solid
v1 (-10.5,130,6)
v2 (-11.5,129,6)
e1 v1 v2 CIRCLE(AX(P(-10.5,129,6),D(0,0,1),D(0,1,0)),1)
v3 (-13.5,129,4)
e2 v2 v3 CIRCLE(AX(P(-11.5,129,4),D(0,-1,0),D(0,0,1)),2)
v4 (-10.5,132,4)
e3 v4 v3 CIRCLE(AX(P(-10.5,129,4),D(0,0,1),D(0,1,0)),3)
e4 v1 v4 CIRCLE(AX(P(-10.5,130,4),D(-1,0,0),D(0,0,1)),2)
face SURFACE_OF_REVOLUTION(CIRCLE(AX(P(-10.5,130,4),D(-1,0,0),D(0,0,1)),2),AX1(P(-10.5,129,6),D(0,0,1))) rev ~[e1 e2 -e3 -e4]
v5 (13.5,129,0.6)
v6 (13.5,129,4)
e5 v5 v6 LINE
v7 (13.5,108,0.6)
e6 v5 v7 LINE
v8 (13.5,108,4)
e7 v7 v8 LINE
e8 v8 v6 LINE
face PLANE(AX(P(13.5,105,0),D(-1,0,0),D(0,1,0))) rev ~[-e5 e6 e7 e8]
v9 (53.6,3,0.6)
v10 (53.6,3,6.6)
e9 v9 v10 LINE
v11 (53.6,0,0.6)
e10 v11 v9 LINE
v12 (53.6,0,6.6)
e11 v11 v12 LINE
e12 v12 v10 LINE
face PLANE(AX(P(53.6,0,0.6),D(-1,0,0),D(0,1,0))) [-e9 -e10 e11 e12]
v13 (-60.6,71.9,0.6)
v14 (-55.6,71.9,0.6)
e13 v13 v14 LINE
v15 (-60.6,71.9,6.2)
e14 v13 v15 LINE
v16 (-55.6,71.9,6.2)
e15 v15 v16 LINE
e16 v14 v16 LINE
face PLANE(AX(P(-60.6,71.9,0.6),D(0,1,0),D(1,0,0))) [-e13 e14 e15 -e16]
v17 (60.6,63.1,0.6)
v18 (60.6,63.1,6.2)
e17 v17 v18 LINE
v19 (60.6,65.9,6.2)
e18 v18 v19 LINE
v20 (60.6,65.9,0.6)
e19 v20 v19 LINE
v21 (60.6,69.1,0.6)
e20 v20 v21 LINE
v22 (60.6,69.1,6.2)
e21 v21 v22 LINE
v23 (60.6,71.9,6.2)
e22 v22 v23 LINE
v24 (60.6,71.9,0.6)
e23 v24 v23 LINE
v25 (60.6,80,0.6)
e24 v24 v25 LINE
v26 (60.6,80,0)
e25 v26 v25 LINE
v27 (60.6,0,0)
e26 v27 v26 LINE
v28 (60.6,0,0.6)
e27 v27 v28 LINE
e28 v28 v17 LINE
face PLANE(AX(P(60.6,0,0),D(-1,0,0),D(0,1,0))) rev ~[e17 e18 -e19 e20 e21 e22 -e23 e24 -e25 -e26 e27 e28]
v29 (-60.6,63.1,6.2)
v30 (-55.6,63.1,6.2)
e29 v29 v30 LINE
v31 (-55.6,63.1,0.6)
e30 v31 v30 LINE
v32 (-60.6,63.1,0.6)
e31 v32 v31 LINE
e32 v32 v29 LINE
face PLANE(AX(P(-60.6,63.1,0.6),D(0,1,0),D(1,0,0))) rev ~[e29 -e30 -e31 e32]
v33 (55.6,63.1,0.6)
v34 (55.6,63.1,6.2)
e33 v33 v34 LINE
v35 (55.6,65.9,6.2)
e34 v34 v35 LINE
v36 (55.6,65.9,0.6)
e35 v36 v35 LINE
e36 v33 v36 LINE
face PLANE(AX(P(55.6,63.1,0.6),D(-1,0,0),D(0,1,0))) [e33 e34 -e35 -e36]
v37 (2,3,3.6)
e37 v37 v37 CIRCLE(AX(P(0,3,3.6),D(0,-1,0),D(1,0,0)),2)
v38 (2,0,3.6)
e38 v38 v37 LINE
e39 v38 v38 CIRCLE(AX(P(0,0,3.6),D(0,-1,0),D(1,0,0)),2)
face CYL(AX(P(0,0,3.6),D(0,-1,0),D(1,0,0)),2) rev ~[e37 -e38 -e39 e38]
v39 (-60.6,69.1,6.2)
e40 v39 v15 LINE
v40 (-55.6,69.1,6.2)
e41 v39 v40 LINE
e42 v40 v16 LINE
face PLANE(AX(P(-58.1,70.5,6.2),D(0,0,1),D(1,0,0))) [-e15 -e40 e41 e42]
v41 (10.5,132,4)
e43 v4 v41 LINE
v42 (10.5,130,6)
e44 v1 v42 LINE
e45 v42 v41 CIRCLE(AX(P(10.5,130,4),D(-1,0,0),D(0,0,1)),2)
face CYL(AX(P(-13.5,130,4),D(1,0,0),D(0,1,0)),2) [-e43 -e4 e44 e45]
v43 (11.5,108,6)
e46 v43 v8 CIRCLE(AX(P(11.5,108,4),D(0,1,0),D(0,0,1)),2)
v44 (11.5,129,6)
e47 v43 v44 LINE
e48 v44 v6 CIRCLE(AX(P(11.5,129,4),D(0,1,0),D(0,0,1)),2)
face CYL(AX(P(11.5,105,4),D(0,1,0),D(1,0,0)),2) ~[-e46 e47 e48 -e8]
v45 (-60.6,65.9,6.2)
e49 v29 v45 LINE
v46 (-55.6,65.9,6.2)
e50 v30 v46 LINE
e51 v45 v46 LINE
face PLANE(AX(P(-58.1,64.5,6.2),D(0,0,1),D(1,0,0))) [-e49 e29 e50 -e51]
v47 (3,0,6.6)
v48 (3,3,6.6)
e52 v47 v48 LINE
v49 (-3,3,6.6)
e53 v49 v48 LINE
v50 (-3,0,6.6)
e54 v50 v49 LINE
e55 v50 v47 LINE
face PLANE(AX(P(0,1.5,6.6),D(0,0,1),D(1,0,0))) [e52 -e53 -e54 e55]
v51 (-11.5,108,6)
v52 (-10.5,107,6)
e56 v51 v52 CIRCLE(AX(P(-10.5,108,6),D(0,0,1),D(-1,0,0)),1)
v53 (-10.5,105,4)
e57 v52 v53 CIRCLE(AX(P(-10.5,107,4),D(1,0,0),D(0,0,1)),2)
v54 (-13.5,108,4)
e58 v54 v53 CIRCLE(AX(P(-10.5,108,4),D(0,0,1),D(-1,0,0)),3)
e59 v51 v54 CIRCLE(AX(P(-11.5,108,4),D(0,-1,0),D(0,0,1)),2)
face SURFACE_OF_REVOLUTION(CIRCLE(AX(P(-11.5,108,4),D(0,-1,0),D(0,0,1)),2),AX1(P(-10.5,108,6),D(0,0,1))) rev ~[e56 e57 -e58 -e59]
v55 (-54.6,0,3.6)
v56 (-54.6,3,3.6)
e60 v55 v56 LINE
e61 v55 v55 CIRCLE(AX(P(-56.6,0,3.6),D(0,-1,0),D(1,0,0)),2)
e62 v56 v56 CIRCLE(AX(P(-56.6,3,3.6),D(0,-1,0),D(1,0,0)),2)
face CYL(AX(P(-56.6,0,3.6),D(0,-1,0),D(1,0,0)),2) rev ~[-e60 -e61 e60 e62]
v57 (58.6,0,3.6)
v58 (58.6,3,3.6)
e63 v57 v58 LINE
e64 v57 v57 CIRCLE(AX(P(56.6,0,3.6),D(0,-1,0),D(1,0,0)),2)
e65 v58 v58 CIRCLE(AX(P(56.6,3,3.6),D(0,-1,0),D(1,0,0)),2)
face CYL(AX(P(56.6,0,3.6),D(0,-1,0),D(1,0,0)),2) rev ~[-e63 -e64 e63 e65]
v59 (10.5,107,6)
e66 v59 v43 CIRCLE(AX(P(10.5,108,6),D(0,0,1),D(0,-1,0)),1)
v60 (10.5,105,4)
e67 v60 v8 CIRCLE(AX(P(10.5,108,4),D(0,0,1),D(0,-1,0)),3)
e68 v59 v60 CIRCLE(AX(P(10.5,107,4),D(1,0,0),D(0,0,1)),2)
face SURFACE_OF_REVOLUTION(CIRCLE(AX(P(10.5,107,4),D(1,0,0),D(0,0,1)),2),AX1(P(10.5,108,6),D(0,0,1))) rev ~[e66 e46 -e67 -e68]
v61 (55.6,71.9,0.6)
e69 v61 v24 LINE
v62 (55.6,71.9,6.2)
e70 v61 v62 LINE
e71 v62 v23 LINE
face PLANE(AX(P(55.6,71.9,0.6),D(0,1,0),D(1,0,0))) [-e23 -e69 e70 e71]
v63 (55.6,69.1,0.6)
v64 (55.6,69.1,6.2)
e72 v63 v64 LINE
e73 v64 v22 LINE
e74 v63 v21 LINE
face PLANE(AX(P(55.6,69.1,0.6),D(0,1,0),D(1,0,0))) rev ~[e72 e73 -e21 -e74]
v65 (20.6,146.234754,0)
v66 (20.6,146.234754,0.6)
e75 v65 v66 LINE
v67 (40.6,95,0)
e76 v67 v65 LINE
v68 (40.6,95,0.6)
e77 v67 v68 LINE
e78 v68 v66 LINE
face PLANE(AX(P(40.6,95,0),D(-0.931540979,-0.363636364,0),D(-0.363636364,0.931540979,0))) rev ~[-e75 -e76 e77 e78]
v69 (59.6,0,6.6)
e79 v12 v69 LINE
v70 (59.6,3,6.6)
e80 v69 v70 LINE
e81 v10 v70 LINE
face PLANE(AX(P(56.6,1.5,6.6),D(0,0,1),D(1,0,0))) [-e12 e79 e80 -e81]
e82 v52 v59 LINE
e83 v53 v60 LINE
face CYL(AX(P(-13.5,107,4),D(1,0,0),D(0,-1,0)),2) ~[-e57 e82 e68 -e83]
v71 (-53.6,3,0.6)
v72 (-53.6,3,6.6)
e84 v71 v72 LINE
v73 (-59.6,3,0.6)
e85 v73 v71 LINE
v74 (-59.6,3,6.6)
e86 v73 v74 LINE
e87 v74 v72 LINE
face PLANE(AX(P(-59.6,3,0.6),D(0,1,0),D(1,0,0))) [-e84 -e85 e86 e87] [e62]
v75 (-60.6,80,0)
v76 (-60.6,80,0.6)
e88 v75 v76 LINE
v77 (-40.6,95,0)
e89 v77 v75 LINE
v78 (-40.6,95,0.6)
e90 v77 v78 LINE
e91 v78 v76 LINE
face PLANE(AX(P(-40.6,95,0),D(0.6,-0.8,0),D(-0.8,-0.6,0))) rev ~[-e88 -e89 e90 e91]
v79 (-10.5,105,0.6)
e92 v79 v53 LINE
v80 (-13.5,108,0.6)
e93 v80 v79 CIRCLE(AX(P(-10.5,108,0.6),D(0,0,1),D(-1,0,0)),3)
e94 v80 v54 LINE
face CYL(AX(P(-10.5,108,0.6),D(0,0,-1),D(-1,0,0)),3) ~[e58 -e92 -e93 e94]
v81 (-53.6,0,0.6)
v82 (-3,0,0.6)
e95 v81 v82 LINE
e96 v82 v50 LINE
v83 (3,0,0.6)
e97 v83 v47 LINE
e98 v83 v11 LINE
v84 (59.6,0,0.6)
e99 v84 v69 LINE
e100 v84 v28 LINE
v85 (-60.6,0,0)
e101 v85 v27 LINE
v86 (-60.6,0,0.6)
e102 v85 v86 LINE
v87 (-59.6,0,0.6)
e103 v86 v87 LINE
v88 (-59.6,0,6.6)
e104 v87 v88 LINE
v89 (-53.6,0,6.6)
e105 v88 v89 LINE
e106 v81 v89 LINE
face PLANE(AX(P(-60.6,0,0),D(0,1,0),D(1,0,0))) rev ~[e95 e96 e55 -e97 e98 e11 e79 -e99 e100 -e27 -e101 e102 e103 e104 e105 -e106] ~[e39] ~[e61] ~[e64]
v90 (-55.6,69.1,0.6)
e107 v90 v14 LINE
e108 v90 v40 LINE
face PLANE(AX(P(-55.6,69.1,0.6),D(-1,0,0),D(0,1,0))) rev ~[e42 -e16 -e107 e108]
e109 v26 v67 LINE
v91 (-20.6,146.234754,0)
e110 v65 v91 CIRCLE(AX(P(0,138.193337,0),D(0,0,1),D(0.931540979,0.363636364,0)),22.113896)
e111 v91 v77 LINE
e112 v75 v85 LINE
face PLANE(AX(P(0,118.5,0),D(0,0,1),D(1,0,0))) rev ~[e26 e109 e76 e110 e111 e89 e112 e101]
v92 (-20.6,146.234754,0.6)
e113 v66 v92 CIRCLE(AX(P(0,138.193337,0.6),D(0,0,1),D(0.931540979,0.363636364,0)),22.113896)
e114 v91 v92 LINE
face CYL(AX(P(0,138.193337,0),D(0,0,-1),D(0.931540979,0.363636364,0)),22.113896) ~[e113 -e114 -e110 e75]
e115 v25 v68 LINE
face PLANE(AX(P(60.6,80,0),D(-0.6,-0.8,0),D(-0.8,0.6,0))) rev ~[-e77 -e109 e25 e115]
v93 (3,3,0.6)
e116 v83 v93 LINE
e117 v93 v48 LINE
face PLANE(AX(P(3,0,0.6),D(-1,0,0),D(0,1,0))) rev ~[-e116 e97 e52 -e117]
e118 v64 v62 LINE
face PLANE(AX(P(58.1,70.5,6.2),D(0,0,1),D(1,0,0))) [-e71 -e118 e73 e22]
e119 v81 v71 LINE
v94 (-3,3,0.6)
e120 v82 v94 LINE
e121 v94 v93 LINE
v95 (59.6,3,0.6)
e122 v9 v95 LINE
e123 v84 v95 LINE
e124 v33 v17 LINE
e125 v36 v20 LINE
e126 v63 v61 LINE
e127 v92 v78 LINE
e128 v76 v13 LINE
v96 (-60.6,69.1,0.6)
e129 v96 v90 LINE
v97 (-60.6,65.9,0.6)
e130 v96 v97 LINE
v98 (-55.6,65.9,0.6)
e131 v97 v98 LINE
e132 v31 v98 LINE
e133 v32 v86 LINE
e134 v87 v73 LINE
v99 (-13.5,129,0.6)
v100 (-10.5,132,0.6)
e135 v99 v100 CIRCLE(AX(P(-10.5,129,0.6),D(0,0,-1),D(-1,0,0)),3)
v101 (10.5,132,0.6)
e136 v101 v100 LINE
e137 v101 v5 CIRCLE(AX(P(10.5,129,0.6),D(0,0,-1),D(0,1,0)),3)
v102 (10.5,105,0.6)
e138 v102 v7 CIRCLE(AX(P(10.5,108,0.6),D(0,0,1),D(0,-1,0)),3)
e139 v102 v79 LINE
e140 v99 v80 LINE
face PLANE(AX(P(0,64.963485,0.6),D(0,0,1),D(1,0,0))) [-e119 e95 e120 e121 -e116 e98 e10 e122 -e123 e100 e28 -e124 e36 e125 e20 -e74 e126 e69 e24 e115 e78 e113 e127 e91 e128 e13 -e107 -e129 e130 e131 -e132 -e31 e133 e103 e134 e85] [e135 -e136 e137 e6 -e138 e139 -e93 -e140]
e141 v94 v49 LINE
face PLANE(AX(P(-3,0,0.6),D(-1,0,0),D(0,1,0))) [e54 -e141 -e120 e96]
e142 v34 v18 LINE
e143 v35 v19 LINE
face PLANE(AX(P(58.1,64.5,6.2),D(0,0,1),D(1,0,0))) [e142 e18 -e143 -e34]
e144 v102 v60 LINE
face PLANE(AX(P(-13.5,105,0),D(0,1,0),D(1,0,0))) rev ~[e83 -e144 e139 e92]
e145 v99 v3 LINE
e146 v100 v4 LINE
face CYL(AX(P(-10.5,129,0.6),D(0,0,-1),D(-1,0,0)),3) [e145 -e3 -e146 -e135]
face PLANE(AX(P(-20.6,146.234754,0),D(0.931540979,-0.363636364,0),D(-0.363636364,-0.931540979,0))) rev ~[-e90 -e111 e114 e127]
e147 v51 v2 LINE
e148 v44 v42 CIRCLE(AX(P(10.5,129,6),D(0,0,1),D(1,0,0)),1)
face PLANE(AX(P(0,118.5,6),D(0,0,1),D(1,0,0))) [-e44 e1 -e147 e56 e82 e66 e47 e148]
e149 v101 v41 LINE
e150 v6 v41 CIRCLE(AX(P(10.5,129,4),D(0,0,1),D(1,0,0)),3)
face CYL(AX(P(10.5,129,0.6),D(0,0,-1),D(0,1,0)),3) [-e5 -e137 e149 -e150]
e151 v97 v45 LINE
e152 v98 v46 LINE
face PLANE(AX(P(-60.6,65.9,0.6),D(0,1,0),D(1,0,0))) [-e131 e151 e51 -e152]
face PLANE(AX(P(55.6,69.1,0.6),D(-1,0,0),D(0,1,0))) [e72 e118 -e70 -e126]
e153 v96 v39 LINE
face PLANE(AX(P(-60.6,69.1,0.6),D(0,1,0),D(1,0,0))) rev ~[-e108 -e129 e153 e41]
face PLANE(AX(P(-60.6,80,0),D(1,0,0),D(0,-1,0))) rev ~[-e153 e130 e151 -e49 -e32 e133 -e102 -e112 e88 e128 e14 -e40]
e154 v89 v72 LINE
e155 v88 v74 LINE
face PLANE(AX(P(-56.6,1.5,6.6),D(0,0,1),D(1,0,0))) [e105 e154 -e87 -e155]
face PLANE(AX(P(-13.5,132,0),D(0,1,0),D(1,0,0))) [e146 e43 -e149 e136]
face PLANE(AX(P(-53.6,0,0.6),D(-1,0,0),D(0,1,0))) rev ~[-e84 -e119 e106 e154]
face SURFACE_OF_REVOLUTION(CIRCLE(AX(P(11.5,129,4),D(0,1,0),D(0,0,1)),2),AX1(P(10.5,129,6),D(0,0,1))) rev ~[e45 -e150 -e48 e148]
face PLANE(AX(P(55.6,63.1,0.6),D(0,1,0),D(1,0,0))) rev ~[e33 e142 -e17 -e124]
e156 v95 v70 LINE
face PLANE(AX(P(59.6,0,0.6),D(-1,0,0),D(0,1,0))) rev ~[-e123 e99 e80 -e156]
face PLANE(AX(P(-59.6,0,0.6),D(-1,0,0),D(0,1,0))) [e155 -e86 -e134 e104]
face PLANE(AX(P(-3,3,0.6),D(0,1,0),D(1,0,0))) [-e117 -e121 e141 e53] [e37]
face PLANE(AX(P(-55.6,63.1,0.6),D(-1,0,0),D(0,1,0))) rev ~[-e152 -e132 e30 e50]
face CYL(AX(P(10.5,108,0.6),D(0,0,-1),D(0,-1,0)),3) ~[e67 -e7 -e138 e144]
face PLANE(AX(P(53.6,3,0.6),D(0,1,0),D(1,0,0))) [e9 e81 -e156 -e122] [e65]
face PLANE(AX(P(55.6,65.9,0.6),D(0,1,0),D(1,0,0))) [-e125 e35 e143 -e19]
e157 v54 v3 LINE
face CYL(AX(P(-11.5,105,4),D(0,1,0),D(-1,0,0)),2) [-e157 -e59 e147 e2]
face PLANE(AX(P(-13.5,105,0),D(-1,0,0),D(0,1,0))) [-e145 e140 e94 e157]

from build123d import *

# Parameters (mm, degrees)
F0_W         = 27
F0_H         = 27
F1_DEPTH     = 0.6
F2_DEPTH     = 6
F3_R         = 2
F4_T1_DEPTH  = 5.4
F4_T4_ANGLE  = 90
F4_T6_ANGLE  = 90
F4_T8_ANGLE  = 90
F4_T10_ANGLE = 90
F5_W         = 5
F5_H         = 2.8
F6_DEPTH     = 5.6
F7_W         = 6
F7_H         = 3
F8_DEPTH     = 6
F9_R         = 2
F10_DEPTH    = 4


# Not quite as in the source:
# - a fillet or chamfer that OpenCascade refuses, or shapes differently, is made with other operations: its cross-section is extruded or revolved along the edge and cut away or added


with BuildPart() as f1:
    # F0 (on Top) → F1 (new body)
    with BuildSketch(Plane.XY):
        with BuildLine():
            Line((-40.6, 95), (-60.6, 80))
            Line((-60.6, 80), (-60.6, 0))
            Line((-60.6, 0), (60.6, 0))
            Line((60.6, 0), (60.6, 80))
            Line((60.6, 80), (40.6, 95))
            Line((40.6, 95), (20.6, 146.2347538298))
            ThreePointArc((20.6, 146.2347538298), (0, 160.3072328817), (-20.6, 146.2347538298))
            Line((-20.6, 146.2347538298), (-40.6, 95))
        make_face()
        with Locations((0, 118.5)):
            Rectangle(F0_W, F0_H, mode=Mode.SUBTRACT)
        with Locations((0, 118.5)):
            Rectangle(F0_W, F0_H)
    extrude(amount=F1_DEPTH)

    # F0 (on Top) → F2 (join)
    with BuildSketch(Plane.XY):
        with Locations((0, 118.5)):
            Rectangle(F0_W, F0_H)
    extrude(amount=F2_DEPTH)

    # F3
    f3_edges = [f1.edges().sort_by_distance(p)[0] for p in [
        (0, 132, 6),
        (-13.5, 118.5, 6),
        (0, 105, 6),
        (13.5, 118.5, 6),
    ]]
    fillet(f3_edges, radius=F3_R)

    # F4: fillet of radius 3 on 4 edges, made by hand

    # F4_s2 → F4_t1 (cut)
    with BuildSketch(Plane.XY.offset(0.6)):
        with BuildLine():
            ThreePointArc((-13.5, 129), (-12.6213203436, 131.1213203436), (-10.5, 132))
            Line((-10.5, 132), (-13.5, 132))
            Line((-13.5, 132), (-13.5, 129))
        make_face()
        with BuildLine():
            ThreePointArc((-13.5, 108), (-12.6213203436, 105.8786796564), (-10.5, 105))
            Line((-10.5, 105), (-13.5, 105))
            Line((-13.5, 105), (-13.5, 108))
        make_face()
        with BuildLine():
            ThreePointArc((10.5, 105), (12.6213203436, 105.8786796564), (13.5, 108))
            Line((13.5, 108), (13.5, 105))
            Line((13.5, 105), (10.5, 105))
        make_face()
        with BuildLine():
            ThreePointArc((10.5, 132), (12.6213203436, 131.1213203436), (13.5, 129))
            Line((13.5, 129), (13.5, 132))
            Line((13.5, 132), (10.5, 132))
        make_face()
    extrude(amount=F4_T1_DEPTH, mode=Mode.SUBTRACT)

    # F4_s3 → F4_t4 (revolve, cut)
    with BuildSketch(Plane.XZ.offset(-129)):
        with BuildLine():
            ThreePointArc((11.5, 6), (12.9142135624, 5.4142135624), (13.5, 4))
            Line((13.5, 4), (13.5, 6))
            Line((13.5, 6), (11.5, 6))
        make_face()
    revolve(axis=Axis((10.5, 129, 6), (0, 0, 1)), revolution_arc=F4_T4_ANGLE, mode=Mode.SUBTRACT)

    # F4_s5 → F4_t6 (revolve, cut)
    with BuildSketch(Plane.YZ.offset(10.5)):
        with BuildLine():
            ThreePointArc((107, 6), (105.5857864376, 5.4142135624), (105, 4))
            Line((105, 4), (105, 6))
            Line((105, 6), (107, 6))
        make_face()
    revolve(axis=Axis((10.5, 108, 6), (0, 0, 1)), revolution_arc=F4_T6_ANGLE, mode=Mode.SUBTRACT)

    # F4_s7 → F4_t8 (revolve, cut)
    with BuildSketch(Plane.XZ.offset(-108)):
        with BuildLine():
            ThreePointArc((-11.5, 6), (-12.9142135624, 5.4142135624), (-13.5, 4))
            Line((-13.5, 4), (-13.5, 6))
            Line((-13.5, 6), (-11.5, 6))
        make_face()
    revolve(axis=Axis((-10.5, 108, 6), (0, 0, 1)), revolution_arc=F4_T8_ANGLE, mode=Mode.SUBTRACT)

    # F4_s9 → F4_t10 (revolve, cut)
    with BuildSketch(Plane.YZ.offset(-10.5)):
        with BuildLine():
            ThreePointArc((130, 6), (131.4142135624, 5.4142135624), (132, 4))
            Line((132, 4), (132, 6))
            Line((132, 6), (130, 6))
        make_face()
    revolve(axis=Axis((-10.5, 129, 6), (0, 0, 1)), revolution_arc=F4_T10_ANGLE, mode=Mode.SUBTRACT)

    # F5 (on face) → F6 (join)
    with BuildSketch(Plane.XY.offset(0.6)):
        with Locations((-58.1, 70.5)):
            Rectangle(F5_W, F5_H)
        with Locations((-58.1, 64.5)):
            Rectangle(F5_W, F5_H)
        with Locations((58.1, 70.5)):
            Rectangle(F5_W, F5_H)
        with Locations((58.1, 64.5)):
            Rectangle(F5_W, F5_H)
    extrude(amount=F6_DEPTH)

    # F7 (on face) → F8 (join)
    with BuildSketch(Plane.XY.offset(0.6)):
        with Locations((-56.6, 1.5)):
            Rectangle(F7_W, F7_H)
        with Locations((56.6, 1.5)):
            Rectangle(F7_W, F7_H)
        with Locations((0, 1.5)):
            Rectangle(F7_W, F7_H)
    extrude(amount=F8_DEPTH)

    # F9 (on face) → F10 (cut)
    with BuildSketch(Plane.XZ):
        with Locations((56.6, 3.6)):
            Circle(F9_R)
        with Locations((-56.6, 3.6)):
            Circle(F9_R)
        with Locations((0, 3.6)):
            Circle(F9_R)
    extrude(amount=-F10_DEPTH, mode=Mode.SUBTRACT)


solid = f1.part
